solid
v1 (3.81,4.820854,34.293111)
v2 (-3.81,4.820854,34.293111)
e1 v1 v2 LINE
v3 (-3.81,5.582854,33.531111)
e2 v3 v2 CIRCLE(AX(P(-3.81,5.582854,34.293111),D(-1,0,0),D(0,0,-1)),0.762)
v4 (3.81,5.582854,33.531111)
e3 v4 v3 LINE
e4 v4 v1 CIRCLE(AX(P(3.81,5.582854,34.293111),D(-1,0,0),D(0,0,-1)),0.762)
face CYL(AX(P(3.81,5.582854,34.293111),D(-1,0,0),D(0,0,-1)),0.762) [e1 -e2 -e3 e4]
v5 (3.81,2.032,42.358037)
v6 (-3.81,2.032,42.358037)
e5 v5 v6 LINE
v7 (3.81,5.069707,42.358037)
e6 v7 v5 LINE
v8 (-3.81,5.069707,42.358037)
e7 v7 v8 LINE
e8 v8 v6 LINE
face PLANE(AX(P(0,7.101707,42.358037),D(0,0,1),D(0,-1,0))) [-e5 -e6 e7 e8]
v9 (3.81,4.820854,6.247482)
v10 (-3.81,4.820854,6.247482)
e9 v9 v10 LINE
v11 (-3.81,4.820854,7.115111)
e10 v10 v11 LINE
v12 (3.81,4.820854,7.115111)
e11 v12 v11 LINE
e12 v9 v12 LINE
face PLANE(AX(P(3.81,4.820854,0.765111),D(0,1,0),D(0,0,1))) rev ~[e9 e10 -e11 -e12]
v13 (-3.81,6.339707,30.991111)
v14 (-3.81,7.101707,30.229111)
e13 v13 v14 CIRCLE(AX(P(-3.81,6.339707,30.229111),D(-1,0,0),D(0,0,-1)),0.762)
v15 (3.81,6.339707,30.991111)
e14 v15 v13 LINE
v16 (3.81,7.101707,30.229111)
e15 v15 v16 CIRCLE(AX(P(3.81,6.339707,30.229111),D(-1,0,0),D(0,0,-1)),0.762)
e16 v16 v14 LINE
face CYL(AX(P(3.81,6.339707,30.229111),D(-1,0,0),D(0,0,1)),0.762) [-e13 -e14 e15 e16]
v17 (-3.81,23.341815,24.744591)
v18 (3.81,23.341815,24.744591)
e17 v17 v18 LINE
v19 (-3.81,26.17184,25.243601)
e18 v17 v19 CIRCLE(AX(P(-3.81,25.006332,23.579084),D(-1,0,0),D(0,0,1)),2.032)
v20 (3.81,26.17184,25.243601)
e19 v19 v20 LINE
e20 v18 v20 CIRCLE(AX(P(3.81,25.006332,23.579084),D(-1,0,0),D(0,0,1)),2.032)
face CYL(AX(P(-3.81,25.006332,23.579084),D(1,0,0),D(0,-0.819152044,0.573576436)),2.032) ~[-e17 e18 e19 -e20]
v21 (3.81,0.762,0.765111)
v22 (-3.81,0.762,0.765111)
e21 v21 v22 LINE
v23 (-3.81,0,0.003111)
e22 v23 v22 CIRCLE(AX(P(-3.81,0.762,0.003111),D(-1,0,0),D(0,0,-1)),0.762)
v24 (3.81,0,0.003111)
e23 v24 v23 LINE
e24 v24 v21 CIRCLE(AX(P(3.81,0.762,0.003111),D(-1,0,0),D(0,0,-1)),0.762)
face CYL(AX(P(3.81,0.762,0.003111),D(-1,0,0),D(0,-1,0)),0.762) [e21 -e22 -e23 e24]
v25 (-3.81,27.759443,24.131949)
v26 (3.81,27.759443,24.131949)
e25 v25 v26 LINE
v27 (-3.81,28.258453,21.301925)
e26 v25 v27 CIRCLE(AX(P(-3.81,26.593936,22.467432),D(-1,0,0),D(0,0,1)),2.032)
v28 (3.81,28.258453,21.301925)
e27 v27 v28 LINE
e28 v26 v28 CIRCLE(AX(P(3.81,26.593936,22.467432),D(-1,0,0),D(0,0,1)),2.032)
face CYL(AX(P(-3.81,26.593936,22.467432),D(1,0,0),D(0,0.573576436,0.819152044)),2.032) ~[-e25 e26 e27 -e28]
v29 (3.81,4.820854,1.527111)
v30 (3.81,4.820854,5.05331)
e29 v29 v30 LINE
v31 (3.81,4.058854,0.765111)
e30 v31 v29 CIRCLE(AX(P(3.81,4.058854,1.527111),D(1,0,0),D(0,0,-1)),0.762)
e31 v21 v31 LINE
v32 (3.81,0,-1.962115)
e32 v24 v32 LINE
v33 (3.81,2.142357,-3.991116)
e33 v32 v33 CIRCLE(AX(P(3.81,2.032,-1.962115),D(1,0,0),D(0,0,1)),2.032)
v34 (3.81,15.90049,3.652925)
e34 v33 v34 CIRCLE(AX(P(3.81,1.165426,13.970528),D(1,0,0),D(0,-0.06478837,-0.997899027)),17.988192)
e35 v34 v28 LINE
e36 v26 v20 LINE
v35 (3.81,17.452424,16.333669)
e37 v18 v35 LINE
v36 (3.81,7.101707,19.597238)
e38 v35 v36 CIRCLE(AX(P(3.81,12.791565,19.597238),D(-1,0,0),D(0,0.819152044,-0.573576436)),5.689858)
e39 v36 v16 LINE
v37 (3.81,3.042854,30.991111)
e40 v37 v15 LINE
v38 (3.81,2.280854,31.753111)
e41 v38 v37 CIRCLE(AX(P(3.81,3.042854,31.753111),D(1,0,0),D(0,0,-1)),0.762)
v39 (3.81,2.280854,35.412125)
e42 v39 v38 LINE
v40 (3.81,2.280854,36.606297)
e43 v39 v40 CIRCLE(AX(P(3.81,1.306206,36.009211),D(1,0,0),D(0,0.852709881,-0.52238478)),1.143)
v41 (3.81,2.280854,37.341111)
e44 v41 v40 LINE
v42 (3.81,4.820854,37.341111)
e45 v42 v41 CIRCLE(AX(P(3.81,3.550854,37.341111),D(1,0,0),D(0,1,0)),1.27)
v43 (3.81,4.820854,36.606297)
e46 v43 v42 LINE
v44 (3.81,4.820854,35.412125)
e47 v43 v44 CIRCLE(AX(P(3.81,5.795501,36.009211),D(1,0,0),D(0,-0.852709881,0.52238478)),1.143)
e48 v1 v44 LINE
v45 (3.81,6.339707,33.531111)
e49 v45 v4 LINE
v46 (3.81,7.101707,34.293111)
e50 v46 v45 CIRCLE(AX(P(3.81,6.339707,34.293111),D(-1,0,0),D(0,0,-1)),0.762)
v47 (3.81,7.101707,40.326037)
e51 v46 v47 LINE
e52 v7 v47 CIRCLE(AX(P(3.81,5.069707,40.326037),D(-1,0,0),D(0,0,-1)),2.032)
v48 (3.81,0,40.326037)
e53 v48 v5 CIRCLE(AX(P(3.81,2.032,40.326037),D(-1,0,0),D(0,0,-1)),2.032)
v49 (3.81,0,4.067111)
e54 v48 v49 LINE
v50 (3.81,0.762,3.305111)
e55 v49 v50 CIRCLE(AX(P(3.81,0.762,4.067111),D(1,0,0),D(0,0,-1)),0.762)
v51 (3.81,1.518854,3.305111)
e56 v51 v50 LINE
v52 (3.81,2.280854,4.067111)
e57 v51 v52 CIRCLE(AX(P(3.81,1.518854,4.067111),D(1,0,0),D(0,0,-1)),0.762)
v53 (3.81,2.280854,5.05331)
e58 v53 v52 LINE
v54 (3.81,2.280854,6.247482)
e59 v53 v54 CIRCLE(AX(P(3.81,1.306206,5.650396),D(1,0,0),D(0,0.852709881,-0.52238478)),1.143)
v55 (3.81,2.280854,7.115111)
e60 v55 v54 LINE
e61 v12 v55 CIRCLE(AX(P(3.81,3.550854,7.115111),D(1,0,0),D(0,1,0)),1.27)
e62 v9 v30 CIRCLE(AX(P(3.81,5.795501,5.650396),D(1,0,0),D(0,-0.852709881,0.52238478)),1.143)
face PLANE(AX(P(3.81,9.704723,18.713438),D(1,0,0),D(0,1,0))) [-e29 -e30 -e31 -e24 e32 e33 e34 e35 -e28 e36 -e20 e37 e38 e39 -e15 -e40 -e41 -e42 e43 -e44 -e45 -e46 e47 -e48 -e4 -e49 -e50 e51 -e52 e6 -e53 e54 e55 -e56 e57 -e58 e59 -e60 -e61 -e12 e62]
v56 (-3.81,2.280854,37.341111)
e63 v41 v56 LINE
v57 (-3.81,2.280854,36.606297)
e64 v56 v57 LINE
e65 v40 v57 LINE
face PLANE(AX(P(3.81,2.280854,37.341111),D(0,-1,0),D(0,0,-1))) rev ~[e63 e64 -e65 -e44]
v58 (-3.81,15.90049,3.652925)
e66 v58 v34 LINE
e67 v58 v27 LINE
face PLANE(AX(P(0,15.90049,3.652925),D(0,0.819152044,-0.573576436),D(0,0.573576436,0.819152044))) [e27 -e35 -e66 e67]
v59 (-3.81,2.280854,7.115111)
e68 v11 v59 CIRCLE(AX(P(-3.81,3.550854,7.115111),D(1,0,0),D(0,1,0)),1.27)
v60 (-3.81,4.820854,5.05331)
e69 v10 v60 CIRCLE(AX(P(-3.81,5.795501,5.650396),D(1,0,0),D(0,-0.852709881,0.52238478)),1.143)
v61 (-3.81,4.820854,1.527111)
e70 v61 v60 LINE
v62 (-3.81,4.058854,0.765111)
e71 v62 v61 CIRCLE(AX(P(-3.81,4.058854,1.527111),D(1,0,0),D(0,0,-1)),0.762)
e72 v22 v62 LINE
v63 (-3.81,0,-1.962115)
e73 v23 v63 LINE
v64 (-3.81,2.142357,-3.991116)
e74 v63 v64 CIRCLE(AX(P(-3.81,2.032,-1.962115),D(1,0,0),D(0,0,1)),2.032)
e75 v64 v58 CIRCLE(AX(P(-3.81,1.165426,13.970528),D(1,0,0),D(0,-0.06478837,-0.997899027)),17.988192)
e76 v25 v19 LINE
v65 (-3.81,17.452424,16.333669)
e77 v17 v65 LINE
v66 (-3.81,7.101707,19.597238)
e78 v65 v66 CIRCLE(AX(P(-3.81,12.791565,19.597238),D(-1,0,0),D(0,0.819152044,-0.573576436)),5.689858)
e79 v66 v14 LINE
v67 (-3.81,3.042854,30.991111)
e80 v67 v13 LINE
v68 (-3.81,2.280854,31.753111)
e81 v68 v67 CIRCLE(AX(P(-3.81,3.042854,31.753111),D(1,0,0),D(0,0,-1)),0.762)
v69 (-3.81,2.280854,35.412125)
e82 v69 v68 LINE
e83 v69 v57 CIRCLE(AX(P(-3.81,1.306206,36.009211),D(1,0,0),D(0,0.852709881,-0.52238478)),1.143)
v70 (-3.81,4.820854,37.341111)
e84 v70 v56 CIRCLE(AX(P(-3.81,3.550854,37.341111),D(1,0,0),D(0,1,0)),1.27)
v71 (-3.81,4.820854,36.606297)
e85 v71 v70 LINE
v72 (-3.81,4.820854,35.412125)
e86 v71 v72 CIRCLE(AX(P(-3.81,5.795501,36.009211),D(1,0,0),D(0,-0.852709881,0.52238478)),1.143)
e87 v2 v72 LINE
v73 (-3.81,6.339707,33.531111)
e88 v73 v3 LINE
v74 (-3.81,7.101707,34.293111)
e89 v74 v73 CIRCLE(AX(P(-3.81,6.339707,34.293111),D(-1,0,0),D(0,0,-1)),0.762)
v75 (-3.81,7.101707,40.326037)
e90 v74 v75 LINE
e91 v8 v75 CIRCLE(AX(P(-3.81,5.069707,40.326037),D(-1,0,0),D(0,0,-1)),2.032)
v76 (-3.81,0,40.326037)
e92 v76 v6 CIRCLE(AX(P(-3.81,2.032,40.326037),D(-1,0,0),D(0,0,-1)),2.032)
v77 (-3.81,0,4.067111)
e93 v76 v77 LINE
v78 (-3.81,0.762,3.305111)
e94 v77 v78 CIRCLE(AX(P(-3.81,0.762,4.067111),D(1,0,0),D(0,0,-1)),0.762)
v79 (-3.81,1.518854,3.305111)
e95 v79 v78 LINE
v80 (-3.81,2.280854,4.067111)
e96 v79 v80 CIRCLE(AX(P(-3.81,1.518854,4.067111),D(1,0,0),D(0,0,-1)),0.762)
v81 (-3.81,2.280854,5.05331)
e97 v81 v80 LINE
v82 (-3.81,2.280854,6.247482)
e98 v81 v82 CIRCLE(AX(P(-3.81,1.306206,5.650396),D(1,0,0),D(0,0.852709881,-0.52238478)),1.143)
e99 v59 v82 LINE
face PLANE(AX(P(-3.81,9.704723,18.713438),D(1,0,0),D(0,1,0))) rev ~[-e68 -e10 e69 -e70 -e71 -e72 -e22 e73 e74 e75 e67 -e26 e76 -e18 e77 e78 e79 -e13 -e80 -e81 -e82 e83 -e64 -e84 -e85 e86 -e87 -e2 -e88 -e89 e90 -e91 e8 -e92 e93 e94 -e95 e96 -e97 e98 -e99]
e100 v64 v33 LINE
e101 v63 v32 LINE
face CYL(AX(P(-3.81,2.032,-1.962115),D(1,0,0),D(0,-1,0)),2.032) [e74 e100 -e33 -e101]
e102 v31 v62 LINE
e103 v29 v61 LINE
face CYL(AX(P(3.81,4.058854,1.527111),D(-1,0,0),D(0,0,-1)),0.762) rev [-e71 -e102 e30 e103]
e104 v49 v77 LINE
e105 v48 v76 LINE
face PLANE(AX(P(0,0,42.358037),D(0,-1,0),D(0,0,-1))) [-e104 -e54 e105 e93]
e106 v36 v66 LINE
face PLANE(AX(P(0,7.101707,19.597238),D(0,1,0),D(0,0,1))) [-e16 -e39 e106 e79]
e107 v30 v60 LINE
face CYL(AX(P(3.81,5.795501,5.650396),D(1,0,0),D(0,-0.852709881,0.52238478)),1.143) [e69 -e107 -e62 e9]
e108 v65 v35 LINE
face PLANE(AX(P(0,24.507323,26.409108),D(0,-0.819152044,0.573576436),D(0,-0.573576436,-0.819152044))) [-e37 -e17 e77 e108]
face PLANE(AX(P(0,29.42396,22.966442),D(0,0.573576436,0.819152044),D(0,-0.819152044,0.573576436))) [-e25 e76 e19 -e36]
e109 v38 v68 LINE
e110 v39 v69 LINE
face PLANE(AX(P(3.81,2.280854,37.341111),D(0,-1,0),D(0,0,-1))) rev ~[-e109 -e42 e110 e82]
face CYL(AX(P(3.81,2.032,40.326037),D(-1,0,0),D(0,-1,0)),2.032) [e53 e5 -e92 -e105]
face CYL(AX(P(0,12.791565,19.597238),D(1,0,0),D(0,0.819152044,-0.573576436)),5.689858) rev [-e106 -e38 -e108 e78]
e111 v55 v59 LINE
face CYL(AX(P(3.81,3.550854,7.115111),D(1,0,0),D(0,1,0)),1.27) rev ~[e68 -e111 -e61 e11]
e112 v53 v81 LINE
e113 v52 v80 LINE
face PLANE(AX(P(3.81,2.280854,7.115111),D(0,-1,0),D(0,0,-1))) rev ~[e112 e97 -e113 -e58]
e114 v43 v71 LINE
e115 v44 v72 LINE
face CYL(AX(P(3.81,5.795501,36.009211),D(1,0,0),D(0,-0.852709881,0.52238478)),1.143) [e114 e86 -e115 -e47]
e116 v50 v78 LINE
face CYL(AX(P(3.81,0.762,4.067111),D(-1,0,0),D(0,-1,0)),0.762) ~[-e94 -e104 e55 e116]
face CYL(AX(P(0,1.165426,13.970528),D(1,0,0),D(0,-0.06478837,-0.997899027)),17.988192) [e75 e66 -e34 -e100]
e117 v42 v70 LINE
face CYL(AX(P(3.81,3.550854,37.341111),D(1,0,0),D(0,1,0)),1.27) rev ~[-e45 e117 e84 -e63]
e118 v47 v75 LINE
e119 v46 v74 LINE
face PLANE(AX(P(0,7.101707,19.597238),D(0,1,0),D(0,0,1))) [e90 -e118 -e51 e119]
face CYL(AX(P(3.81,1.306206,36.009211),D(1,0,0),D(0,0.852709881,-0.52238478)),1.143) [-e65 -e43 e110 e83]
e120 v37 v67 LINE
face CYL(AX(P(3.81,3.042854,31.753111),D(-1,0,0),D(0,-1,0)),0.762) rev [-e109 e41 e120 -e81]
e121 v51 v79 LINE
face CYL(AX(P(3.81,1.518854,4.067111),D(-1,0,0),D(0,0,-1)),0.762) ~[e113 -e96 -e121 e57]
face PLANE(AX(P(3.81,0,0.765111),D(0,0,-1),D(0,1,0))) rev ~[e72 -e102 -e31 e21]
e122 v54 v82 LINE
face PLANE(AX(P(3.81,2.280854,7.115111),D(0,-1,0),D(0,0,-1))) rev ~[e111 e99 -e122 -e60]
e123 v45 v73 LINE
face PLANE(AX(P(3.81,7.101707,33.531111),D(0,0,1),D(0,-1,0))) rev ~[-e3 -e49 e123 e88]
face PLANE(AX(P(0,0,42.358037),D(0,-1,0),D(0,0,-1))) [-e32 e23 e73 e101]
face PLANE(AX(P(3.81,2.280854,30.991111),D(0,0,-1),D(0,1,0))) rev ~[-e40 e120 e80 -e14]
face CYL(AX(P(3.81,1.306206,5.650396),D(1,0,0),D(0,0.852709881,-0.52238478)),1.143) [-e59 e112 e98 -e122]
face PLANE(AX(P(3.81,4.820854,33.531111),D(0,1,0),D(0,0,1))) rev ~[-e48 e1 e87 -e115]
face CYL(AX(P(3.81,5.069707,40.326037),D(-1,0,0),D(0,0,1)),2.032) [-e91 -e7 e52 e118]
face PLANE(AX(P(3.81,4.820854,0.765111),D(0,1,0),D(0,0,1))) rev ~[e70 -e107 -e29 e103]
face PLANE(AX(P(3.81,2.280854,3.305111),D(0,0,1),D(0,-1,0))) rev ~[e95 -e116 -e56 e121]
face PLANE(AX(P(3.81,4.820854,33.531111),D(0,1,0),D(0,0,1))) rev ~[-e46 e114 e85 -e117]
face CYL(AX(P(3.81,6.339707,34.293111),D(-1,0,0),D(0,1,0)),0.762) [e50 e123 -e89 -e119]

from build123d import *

# Parameters (mm, degrees)
F1_DEPTH = 3.81
F2_R     = 2.032
F4_DEPTH = 7.621
F5_R     = 0.762
F7_DEPTH = 7.62


# Not quite as in the source:
# - a feature names something its author has since deleted; it is built from what else it names


with BuildPart() as f1:
    # F0 (on Right) → F1 (new body, symmetric)
    with BuildSketch(Plane.YZ):
        with BuildLine():
            Line((0, 42.3580370843), (0, 0))
            Line((0, 0), (0, -3.979871033))
            ThreePointArc((0, -3.979871033), (8.9499402185, -2.2460183558), (15.9004898533, 3.6529251764))
            Line((15.9004898533, 3.6529251764), (29.4239599312, 22.9664420122))
            Line((29.4239599312, 22.9664420122), (24.5073227445, 26.4091084329))
            Line((24.5073227445, 26.4091084329), (17.4524241549, 16.3336690744))
            ThreePointArc((17.4524241549, 16.3336690744), (11.0805919315, 14.1707234894), (7.1017071605, 19.5972376068))
            Line((7.1017071605, 19.5972376068), (7.1017071605, 42.3580370843))
            Line((7.1017071605, 42.3580370843), (0, 42.3580370843))
        make_face()
    extrude(amount=F1_DEPTH, both=True)

    # F2
    f2_edges = [f1.edges().sort_by_distance(p)[0] for p in [
        (0, 7.101707, 42.358037),
        (0, 0, 42.358037),
        (0, 29.42396, 22.966442),
        (0, 24.507323, 26.409108),
        (0, 0, -3.979871),
    ]]
    fillet(f2_edges, radius=F2_R)

    # F3 (on face) → F4 (cut, through all)
    with BuildSketch(Plane.YZ.offset(3.81)):
        with BuildLine():
            Line((4.8208535802, 33.5311107337), (4.8208535802, 37.3411107337))
            ThreePointArc((4.8208535802, 37.3411107337), (3.5508535802, 38.6111107337), (2.2808535802, 37.3411107337))
            Line((2.2808535802, 37.3411107337), (2.2808535802, 30.9911107337))
            Line((2.2808535802, 30.9911107337), (7.1017071605, 30.9911107337))
            Line((7.1017071605, 30.9911107337), (7.1017071605, 33.5311107337))
            Line((7.1017071605, 33.5311107337), (4.8208535802, 33.5311107337))
        make_face()
        with BuildLine():
            Line((4.8208535802, 0.7651107337), (4.8208535802, 7.1151107337))
            ThreePointArc((4.8208535802, 7.1151107337), (3.5508535802, 8.3851107337), (2.2808535802, 7.1151107337))
            Line((2.2808535802, 7.1151107337), (2.2808535802, 3.3051107337))
            Line((2.2808535802, 3.3051107337), (0, 3.3051107337))
            Line((0, 3.3051107337), (0, 0.7651107337))
            Line((0, 0.7651107337), (4.8208535802, 0.7651107337))
        make_face()
    extrude(amount=-F4_DEPTH, mode=Mode.SUBTRACT)

    # F5
    f5_edges = [f1.edges().sort_by_distance(p)[0] for p in [
        (0, 4.820854, 33.531111),
        (0, 7.101707, 33.531111),
        (0, 2.280854, 30.991111),
        (0, 7.101707, 30.991111),
        (0, 0, 3.305111),
        (0, 4.820854, 0.765111),
        (0, 0, 0.765111),
        (0, 2.280854, 3.305111),
    ]]
    fillet(f5_edges, radius=F5_R)

    # F6 (on face) → F7 (join, through all)
    with BuildSketch(Plane.YZ.offset(3.81)):
        with BuildLine():
            Line((4.8208535802, 35.4121252894), (4.8208535802, 36.6062968969))
            ThreePointArc((4.8208535802, 36.6062968969), (4.6525009744, 36.0092110932), (4.8208535802, 35.4121252894))
        make_face()
        with BuildLine():
            Line((2.2808535802, 36.6062968969), (2.2808535802, 35.4121252894))
            ThreePointArc((2.2808535802, 35.4121252894), (2.4492061861, 36.0092110932), (2.2808535802, 36.6062968969))
        make_face()
        with BuildLine():
            Line((2.2808535802, 6.2474817969), (2.2808535802, 5.0533101894))
            ThreePointArc((2.2808535802, 5.0533101894), (2.4492061861, 5.6503959931), (2.2808535802, 6.2474817969))
        make_face()
        with BuildLine():
            ThreePointArc((4.8208535802, 6.2474817969), (4.6525009744, 5.6503959931), (4.8208535802, 5.0533101894))
            Line((4.8208535802, 5.0533101894), (4.8208535802, 6.2474817969))
        make_face()
    extrude(amount=-F7_DEPTH)


solid = f1.part
